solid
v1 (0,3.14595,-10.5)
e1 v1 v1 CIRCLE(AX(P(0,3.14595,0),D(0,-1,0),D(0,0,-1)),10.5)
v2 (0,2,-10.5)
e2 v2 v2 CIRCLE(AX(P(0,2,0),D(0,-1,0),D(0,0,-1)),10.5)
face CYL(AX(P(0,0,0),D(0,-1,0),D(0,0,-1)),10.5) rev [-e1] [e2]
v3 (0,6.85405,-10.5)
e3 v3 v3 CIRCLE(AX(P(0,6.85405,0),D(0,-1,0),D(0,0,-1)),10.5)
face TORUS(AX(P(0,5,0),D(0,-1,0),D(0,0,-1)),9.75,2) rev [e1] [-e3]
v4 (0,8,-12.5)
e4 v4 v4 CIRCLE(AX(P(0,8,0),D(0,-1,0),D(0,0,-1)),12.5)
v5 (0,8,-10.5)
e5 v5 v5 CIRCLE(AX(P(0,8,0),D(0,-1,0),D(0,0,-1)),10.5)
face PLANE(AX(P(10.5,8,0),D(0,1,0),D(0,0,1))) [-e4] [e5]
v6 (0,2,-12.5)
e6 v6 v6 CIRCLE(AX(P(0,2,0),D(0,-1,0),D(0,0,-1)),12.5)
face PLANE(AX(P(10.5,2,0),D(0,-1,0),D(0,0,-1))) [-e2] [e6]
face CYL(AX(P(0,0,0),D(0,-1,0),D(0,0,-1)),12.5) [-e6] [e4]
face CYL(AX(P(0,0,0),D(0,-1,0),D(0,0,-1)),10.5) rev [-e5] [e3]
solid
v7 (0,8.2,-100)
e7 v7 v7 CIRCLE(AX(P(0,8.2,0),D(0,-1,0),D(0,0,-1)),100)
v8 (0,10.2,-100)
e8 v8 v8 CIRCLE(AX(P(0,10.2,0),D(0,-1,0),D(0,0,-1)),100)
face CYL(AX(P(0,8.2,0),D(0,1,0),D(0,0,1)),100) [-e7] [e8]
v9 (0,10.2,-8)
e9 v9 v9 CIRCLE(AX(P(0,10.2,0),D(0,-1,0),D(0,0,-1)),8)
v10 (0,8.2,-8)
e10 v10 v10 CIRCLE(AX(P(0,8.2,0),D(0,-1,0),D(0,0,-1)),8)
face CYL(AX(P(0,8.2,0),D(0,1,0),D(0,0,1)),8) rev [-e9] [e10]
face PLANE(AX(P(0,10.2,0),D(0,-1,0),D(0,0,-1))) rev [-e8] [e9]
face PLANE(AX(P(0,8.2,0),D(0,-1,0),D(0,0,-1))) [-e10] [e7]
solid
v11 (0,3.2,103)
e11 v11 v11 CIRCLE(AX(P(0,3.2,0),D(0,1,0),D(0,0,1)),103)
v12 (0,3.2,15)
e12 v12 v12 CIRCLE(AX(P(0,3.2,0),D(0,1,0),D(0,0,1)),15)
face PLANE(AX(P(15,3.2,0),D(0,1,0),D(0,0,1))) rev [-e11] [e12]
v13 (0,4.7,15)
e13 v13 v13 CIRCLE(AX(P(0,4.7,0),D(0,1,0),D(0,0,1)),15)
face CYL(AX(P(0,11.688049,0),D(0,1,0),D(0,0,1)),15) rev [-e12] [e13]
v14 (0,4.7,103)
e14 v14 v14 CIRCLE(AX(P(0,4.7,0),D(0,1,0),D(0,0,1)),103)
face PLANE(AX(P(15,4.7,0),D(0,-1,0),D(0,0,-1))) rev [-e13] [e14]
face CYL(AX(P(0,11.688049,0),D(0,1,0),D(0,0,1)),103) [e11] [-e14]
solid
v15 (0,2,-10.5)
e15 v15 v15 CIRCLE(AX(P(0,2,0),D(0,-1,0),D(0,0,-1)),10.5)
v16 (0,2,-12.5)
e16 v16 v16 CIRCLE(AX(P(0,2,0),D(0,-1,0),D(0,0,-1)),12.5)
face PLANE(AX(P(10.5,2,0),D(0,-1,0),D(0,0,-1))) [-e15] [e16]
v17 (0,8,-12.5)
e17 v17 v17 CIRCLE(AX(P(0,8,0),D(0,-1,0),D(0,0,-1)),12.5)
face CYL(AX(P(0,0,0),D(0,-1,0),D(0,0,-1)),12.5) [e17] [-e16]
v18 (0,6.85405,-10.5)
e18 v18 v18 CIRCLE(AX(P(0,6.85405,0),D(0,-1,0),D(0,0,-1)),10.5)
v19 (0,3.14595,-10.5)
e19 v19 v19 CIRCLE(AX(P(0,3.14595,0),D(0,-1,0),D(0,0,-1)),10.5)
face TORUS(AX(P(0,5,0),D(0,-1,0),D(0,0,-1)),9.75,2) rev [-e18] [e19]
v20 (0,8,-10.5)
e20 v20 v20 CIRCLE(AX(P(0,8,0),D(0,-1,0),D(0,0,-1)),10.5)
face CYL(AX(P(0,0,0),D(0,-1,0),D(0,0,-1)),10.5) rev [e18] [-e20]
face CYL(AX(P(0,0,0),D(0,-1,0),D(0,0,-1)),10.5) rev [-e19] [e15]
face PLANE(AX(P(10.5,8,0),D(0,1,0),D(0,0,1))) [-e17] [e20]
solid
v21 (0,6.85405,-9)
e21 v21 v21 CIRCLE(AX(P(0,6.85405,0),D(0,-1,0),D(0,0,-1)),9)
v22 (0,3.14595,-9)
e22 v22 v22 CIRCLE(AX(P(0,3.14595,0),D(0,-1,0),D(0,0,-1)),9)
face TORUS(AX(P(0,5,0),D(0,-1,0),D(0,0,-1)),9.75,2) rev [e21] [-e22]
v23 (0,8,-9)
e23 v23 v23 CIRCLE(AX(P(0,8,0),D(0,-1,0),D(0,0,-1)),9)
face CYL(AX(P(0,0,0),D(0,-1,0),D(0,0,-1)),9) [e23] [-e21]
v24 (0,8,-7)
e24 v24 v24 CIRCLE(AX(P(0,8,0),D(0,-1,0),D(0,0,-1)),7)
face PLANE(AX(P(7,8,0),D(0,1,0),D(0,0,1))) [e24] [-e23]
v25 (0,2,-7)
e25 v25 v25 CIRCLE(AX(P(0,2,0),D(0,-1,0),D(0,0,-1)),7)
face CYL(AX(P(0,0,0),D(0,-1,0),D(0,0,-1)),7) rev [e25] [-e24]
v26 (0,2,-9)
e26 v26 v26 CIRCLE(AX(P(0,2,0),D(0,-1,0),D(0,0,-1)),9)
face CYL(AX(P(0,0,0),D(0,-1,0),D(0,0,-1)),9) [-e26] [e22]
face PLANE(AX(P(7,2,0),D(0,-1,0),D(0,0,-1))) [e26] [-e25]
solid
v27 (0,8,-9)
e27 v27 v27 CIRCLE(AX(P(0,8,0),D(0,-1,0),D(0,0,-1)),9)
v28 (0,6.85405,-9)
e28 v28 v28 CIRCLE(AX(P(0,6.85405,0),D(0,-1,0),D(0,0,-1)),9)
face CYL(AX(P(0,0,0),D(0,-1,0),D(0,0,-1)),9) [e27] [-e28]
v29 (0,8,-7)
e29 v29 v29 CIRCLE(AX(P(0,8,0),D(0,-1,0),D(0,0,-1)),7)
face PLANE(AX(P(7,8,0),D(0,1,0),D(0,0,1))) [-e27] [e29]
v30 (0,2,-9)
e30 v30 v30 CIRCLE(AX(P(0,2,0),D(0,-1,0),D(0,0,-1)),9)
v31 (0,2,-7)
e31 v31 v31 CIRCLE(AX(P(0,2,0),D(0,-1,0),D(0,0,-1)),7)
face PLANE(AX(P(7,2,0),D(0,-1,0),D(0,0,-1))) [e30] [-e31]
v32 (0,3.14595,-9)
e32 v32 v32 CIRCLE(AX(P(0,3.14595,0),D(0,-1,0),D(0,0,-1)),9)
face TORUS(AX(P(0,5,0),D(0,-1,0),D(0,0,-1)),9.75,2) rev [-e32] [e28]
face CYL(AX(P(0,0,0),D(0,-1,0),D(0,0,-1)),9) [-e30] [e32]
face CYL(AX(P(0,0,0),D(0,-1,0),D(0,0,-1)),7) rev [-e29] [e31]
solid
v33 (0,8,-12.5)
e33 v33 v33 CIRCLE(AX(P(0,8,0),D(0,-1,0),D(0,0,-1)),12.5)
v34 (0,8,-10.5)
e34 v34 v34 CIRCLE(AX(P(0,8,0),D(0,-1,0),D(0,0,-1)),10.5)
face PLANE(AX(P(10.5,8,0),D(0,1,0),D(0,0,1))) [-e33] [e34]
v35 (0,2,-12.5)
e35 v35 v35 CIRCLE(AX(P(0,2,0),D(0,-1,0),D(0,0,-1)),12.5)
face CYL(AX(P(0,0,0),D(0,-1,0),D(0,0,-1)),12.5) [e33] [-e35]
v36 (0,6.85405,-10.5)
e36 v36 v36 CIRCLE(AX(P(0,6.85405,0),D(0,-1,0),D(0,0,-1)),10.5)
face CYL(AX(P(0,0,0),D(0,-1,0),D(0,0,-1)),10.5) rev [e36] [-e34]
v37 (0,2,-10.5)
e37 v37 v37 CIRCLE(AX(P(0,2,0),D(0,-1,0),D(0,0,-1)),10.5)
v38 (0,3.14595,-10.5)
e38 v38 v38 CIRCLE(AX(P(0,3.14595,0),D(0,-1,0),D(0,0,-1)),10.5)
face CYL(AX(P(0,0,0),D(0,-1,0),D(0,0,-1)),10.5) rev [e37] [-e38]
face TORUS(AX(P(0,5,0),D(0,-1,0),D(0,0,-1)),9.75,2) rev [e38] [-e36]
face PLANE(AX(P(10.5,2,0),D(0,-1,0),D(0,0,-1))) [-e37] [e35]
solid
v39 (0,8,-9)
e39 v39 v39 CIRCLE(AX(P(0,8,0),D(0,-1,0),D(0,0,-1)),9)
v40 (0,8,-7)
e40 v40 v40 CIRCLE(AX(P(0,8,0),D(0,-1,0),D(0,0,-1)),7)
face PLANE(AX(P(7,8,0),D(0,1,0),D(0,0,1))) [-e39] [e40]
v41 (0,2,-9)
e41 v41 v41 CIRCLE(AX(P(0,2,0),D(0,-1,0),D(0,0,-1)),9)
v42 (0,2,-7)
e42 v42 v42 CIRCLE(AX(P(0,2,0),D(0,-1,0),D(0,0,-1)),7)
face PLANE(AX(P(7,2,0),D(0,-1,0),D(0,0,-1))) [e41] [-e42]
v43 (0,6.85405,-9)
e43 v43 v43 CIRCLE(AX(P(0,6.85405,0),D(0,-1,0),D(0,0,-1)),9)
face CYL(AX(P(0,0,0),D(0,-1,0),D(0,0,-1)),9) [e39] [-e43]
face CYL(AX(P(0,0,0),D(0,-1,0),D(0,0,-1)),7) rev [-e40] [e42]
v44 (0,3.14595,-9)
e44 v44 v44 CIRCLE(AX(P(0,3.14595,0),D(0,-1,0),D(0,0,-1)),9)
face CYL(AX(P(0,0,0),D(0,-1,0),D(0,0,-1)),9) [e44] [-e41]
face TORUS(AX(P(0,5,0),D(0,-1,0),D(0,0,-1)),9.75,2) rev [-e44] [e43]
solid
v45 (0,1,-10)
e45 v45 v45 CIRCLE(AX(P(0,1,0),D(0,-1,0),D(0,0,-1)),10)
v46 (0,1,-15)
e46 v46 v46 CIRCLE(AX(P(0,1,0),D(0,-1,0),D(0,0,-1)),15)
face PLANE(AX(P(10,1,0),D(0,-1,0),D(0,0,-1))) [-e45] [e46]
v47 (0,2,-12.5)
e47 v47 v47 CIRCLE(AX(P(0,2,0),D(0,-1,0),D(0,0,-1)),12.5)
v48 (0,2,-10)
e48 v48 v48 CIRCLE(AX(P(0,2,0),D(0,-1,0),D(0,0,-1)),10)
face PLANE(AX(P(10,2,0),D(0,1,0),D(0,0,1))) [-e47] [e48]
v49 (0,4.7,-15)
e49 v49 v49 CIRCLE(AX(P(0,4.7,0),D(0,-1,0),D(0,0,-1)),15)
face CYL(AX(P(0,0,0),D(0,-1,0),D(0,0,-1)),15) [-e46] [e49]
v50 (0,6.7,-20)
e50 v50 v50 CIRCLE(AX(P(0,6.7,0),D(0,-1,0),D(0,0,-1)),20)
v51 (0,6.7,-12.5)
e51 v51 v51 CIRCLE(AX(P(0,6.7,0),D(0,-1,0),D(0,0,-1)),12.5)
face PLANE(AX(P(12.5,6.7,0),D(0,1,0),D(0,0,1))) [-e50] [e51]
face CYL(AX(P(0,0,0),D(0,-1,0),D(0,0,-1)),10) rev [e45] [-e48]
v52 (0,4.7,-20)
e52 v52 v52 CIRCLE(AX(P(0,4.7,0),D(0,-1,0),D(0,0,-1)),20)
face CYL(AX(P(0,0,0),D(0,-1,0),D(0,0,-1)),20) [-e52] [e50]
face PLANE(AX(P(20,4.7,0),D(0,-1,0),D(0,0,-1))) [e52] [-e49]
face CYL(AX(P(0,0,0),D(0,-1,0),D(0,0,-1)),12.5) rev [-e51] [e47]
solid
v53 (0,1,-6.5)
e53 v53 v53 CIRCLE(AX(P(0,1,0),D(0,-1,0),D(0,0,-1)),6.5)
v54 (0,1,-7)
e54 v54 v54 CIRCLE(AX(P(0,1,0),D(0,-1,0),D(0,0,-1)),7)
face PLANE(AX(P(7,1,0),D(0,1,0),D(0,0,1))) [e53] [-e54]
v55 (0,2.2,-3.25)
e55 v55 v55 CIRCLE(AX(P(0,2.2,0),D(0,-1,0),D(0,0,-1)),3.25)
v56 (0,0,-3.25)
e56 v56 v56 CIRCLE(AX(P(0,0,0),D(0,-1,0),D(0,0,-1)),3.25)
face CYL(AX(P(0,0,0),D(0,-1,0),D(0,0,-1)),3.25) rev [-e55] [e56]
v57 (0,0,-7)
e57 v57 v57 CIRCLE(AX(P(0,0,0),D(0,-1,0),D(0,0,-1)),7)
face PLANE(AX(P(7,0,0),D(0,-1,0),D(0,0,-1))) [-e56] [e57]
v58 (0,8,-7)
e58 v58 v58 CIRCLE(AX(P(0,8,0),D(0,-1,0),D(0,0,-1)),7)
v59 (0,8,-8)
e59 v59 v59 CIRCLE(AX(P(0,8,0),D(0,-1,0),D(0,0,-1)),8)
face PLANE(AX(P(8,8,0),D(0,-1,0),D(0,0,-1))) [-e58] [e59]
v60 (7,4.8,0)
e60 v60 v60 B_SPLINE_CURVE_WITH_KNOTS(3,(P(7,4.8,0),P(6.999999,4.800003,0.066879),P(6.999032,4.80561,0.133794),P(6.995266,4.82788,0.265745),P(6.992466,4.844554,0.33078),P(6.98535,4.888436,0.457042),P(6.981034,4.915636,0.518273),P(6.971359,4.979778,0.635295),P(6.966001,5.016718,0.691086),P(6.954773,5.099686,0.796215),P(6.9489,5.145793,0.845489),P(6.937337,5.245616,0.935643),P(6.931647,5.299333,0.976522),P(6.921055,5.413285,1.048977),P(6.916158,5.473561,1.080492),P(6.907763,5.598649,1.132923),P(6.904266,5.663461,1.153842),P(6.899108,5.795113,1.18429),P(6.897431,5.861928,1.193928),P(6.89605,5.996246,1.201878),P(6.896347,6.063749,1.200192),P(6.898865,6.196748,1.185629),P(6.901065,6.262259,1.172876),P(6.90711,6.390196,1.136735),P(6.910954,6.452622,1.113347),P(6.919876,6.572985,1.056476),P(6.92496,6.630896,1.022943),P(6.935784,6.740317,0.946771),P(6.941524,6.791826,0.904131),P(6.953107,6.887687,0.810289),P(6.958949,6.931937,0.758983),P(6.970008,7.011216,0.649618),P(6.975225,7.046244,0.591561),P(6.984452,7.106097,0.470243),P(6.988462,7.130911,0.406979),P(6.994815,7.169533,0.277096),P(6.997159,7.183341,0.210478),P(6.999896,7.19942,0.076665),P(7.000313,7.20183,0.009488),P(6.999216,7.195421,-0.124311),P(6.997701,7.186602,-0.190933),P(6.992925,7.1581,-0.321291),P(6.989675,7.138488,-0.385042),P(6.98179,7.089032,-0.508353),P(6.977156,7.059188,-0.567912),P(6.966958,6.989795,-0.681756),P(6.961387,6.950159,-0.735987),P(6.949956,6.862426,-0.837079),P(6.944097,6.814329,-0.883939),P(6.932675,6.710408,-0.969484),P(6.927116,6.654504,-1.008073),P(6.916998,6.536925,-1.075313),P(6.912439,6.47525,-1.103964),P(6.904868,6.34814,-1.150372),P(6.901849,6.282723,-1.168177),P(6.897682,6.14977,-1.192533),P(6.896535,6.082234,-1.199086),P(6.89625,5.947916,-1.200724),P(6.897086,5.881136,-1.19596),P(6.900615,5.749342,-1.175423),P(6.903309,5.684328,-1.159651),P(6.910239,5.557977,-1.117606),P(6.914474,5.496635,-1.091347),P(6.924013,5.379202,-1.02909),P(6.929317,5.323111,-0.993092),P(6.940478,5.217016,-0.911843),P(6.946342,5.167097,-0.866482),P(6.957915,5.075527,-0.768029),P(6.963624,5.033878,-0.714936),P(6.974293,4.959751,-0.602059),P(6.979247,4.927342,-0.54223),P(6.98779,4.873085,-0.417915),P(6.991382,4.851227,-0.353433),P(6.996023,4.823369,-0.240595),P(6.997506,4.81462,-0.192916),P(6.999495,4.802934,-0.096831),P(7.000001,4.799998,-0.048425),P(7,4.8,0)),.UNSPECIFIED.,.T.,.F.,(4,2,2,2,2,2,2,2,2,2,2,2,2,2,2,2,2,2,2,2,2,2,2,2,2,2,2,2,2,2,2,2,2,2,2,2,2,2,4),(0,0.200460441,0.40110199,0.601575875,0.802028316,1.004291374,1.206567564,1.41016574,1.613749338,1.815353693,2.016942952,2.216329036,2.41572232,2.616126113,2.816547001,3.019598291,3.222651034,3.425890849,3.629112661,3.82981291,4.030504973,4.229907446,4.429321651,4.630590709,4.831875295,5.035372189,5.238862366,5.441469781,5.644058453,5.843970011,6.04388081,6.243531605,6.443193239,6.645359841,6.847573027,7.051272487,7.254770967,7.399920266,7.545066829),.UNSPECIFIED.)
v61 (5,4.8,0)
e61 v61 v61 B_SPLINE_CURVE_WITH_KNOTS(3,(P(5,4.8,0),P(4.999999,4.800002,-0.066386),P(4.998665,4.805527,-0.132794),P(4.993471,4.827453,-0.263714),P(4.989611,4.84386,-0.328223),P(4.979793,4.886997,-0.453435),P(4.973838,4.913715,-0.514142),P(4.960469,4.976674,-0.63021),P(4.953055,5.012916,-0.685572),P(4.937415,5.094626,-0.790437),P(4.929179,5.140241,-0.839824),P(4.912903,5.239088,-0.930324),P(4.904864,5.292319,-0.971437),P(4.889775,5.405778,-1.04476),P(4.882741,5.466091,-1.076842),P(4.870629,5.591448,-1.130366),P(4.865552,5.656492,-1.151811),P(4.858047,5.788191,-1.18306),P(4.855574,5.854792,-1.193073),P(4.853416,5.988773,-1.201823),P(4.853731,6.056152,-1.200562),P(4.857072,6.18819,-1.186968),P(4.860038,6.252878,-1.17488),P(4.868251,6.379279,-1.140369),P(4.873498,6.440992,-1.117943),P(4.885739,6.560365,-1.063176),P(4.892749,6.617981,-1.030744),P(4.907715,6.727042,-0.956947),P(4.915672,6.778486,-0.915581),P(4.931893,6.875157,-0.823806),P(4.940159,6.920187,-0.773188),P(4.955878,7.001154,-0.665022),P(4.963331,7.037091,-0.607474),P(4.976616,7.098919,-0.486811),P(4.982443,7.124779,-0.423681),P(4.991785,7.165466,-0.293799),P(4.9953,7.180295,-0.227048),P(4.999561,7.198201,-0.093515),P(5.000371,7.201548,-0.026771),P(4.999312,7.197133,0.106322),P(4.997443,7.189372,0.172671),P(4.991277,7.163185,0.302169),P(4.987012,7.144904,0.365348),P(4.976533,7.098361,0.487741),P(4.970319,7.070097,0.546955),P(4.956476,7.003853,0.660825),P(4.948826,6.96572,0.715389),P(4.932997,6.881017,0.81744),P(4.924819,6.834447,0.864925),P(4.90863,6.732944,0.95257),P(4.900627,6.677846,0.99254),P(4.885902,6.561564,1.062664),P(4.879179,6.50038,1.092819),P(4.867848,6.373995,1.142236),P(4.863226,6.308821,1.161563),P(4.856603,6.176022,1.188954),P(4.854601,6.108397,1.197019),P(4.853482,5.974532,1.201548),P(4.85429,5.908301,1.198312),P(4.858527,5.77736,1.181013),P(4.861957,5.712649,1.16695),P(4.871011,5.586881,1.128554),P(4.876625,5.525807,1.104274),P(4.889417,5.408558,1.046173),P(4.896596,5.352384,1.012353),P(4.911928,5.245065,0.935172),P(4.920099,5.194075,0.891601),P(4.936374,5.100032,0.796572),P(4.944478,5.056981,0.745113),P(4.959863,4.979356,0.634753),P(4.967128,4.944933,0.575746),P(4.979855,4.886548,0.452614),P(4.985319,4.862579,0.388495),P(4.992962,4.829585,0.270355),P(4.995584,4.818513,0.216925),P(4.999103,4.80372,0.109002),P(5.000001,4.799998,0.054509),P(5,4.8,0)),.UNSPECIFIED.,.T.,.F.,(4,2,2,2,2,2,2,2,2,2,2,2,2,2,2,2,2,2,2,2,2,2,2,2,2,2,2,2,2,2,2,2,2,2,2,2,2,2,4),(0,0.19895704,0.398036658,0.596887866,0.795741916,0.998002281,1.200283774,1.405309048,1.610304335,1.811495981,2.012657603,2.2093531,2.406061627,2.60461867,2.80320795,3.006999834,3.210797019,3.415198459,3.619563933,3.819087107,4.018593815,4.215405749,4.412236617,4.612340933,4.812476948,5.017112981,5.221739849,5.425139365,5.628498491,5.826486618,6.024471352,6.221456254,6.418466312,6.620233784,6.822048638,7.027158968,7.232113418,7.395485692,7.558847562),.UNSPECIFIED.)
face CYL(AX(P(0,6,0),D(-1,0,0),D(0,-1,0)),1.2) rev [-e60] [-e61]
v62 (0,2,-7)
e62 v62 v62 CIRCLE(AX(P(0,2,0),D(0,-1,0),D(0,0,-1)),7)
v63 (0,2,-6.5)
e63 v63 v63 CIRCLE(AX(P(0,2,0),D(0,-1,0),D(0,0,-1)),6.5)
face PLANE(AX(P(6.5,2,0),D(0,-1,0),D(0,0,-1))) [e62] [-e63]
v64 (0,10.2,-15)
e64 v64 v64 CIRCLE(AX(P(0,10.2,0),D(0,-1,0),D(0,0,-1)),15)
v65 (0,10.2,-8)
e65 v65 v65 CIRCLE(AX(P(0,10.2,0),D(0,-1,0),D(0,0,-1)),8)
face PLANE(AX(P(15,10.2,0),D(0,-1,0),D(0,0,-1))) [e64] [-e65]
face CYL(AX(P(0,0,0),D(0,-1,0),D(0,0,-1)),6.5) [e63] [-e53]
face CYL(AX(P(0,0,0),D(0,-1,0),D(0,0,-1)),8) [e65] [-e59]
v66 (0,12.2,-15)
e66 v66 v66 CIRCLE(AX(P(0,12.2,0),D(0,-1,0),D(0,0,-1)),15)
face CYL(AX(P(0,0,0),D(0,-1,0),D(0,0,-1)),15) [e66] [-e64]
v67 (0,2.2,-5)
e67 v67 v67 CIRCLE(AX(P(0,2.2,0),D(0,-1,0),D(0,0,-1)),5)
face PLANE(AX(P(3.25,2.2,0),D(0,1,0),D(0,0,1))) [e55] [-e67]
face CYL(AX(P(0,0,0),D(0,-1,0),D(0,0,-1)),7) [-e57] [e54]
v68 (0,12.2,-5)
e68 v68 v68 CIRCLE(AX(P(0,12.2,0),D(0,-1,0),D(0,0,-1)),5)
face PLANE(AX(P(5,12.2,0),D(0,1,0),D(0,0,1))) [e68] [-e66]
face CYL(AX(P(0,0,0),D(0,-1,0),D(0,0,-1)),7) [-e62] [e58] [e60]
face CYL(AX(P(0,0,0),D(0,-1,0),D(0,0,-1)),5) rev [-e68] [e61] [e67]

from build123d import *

# Parameters (mm, degrees)
SKICA2_R        = 100
SKICA2_R_2      = 8
VYSUNOUT1_DEPTH = 2
SKICA10_W       = 88
SKICA10_H       = 1.5


# Read off the part's stored shape, not the designer's step: Skica-pole2
with BuildPart() as part:
    # Skica1 → Rotovat1 (revolve)
    with BuildSketch(Plane.XY, mode=Mode.PRIVATE) as rotovat1_sk:
        Polygon((3.25, 0), (3.25, 2.2), (5, 2.2), (5, 12.2), (15, 12.2), (15, 10.2), (8, 10.2), (8, 8), (7, 8), (7, 2), (6.5, 2), (6.5, 1), (7, 1), (7, 0), align=None)
    revolve(rotovat1_sk.sketch.rotate(Axis((0, 0, 0), (0, 1, 0)), 90), axis=Axis((0, 0, 0), (0, 1, 0)))

    # Skica9 → Odebrat rotací1 (revolve, cut)
    with BuildSketch(Plane.XY, mode=Mode.PRIVATE) as odebrat_rotac_1_sk:
        Polygon((3.692820323, 7.2), (7, 7.2), (7, 6), (3, 6), align=None)
    revolve(odebrat_rotac_1_sk.sketch.rotate(Axis((0, 6, 0), (1, 0, 0)), 180), axis=Axis((0, 6, 0), (1, 0, 0)), mode=Mode.SUBTRACT)


with BuildPart() as body_2:
    # Skica2 → Vysunout1 (new body)
    with BuildSketch(Plane.XZ.offset(-10.2)):
        with Locations(Location((0, 0, 0), (0, 0, 270))):
            Circle(SKICA2_R)
        with Locations(Location((0, 0, 0), (0, 0, 270))):
            Circle(SKICA2_R_2, mode=Mode.SUBTRACT)
    extrude(amount=VYSUNOUT1_DEPTH)


with BuildPart() as body_3:
    # Skica4 → Rotovat2 (revolve)
    with BuildSketch(Plane.XY, mode=Mode.PRIVATE) as rotovat2_sk:
        with BuildLine():
            Line((7, 2), (9, 2))
            Line((9, 2), (9, 3.145950378))
            ThreePointArc((9, 3.145950378), (7.75, 5), (9, 6.854049622))
            Line((9, 6.854049622), (9, 8))
            Line((9, 8), (7, 8))
            Line((7, 8), (7, 2))
        make_face()
        with BuildLine():
            Line((12.5, 2), (12.5, 8))
            Line((12.5, 8), (10.5, 8))
            Line((10.5, 8), (10.5, 6.854049622))
            ThreePointArc((10.5, 6.854049622), (11.75, 5), (10.5, 3.145950378))
            Line((10.5, 3.145950378), (10.5, 2))
            Line((10.5, 2), (12.5, 2))
        make_face()
    revolve(rotovat2_sk.sketch.rotate(Axis((0, 0, 0), (0, 1, 0)), 90), axis=Axis((0, 0, 0), (0, 1, 0)))


with BuildPart() as body_4:
    # Skica-pole2 outline → Skica-pole2 (revolve)
    with BuildSketch(Plane.XY):
        with BuildLine():
            Line((9, 8), (7, 8))
            Line((7, 8), (7, 2))
            Line((7, 2), (9, 2))
            Line((9, 2), (9, 3.145950378))
            ThreePointArc((9, 3.145950378), (7.75, 5), (9, 6.854049622))
            Line((9, 6.854049622), (9, 8))
        make_face()
    revolve(axis=Axis((0, 0, 0), (0, 1, 0)))


with BuildPart() as body_5:
    # Skica-pole2 2 outline → Skica-pole2 2 (revolve)
    with BuildSketch(Plane.XY):
        with BuildLine():
            Line((12.5, 8), (10.5, 8))
            Line((10.5, 8), (10.5, 6.854049622))
            ThreePointArc((10.5, 6.854049622), (11.75, 5), (10.5, 3.145950378))
            Line((10.5, 3.145950378), (10.5, 2))
            Line((10.5, 2), (12.5, 2))
            Line((12.5, 2), (12.5, 8))
        make_face()
    revolve(axis=Axis((0, 0, 0), (0, 1, 0)))


with BuildPart() as body_6:
    # Skica-pole2 3 outline → Skica-pole2 3 (revolve)
    with BuildSketch(Plane.XY):
        with BuildLine():
            Line((12.5, 8), (10.5, 8))
            Line((10.5, 8), (10.5, 6.854049622))
            ThreePointArc((10.5, 6.854049622), (11.75, 5), (10.5, 3.145950378))
            Line((10.5, 3.145950378), (10.5, 2))
            Line((10.5, 2), (12.5, 2))
            Line((12.5, 2), (12.5, 8))
        make_face()
    revolve(axis=Axis((0, 0, 0), (0, 1, 0)))


with BuildPart() as body_7:
    # Skica-pole2 4 outline → Skica-pole2 4 (revolve)
    with BuildSketch(Plane.XY):
        with BuildLine():
            Line((9, 8), (7, 8))
            Line((7, 8), (7, 2))
            Line((7, 2), (9, 2))
            Line((9, 2), (9, 3.145950378))
            ThreePointArc((9, 3.145950378), (7.75, 5), (9, 6.854049622))
            Line((9, 6.854049622), (9, 8))
        make_face()
    revolve(axis=Axis((0, 0, 0), (0, 1, 0)))


with BuildPart() as body_8:
    # Skica8 → Rotovat3 (revolve)
    with BuildSketch(Plane.XY, mode=Mode.PRIVATE) as rotovat3_sk:
        Polygon((12.5, 6.7), (20, 6.7), (20, 4.7), (15, 4.7), (15, 1), (10, 1), (10, 2), (12.5, 2), align=None)
    revolve(rotovat3_sk.sketch.rotate(Axis((0, 0, 0), (0, 1, 0)), 90), axis=Axis((0, 0, 0), (0, 1, 0)))


with BuildPart() as body_9:
    # Skica10 → Rotovat4 (revolve)
    with BuildSketch(Plane.XY, mode=Mode.PRIVATE) as rotovat4_sk:
        with Locations((59, 3.95)):
            Rectangle(SKICA10_W, SKICA10_H)
    revolve(rotovat4_sk.sketch.rotate(Axis((0, 11.688049043, 0), (0, 1, 0)), 90), axis=Axis((0, 11.688049043, 0), (0, 1, 0)))


solid = Compound([part.part, body_2.part, body_3.part, body_4.part, body_5.part, body_6.part, body_7.part, body_8.part, body_9.part])
